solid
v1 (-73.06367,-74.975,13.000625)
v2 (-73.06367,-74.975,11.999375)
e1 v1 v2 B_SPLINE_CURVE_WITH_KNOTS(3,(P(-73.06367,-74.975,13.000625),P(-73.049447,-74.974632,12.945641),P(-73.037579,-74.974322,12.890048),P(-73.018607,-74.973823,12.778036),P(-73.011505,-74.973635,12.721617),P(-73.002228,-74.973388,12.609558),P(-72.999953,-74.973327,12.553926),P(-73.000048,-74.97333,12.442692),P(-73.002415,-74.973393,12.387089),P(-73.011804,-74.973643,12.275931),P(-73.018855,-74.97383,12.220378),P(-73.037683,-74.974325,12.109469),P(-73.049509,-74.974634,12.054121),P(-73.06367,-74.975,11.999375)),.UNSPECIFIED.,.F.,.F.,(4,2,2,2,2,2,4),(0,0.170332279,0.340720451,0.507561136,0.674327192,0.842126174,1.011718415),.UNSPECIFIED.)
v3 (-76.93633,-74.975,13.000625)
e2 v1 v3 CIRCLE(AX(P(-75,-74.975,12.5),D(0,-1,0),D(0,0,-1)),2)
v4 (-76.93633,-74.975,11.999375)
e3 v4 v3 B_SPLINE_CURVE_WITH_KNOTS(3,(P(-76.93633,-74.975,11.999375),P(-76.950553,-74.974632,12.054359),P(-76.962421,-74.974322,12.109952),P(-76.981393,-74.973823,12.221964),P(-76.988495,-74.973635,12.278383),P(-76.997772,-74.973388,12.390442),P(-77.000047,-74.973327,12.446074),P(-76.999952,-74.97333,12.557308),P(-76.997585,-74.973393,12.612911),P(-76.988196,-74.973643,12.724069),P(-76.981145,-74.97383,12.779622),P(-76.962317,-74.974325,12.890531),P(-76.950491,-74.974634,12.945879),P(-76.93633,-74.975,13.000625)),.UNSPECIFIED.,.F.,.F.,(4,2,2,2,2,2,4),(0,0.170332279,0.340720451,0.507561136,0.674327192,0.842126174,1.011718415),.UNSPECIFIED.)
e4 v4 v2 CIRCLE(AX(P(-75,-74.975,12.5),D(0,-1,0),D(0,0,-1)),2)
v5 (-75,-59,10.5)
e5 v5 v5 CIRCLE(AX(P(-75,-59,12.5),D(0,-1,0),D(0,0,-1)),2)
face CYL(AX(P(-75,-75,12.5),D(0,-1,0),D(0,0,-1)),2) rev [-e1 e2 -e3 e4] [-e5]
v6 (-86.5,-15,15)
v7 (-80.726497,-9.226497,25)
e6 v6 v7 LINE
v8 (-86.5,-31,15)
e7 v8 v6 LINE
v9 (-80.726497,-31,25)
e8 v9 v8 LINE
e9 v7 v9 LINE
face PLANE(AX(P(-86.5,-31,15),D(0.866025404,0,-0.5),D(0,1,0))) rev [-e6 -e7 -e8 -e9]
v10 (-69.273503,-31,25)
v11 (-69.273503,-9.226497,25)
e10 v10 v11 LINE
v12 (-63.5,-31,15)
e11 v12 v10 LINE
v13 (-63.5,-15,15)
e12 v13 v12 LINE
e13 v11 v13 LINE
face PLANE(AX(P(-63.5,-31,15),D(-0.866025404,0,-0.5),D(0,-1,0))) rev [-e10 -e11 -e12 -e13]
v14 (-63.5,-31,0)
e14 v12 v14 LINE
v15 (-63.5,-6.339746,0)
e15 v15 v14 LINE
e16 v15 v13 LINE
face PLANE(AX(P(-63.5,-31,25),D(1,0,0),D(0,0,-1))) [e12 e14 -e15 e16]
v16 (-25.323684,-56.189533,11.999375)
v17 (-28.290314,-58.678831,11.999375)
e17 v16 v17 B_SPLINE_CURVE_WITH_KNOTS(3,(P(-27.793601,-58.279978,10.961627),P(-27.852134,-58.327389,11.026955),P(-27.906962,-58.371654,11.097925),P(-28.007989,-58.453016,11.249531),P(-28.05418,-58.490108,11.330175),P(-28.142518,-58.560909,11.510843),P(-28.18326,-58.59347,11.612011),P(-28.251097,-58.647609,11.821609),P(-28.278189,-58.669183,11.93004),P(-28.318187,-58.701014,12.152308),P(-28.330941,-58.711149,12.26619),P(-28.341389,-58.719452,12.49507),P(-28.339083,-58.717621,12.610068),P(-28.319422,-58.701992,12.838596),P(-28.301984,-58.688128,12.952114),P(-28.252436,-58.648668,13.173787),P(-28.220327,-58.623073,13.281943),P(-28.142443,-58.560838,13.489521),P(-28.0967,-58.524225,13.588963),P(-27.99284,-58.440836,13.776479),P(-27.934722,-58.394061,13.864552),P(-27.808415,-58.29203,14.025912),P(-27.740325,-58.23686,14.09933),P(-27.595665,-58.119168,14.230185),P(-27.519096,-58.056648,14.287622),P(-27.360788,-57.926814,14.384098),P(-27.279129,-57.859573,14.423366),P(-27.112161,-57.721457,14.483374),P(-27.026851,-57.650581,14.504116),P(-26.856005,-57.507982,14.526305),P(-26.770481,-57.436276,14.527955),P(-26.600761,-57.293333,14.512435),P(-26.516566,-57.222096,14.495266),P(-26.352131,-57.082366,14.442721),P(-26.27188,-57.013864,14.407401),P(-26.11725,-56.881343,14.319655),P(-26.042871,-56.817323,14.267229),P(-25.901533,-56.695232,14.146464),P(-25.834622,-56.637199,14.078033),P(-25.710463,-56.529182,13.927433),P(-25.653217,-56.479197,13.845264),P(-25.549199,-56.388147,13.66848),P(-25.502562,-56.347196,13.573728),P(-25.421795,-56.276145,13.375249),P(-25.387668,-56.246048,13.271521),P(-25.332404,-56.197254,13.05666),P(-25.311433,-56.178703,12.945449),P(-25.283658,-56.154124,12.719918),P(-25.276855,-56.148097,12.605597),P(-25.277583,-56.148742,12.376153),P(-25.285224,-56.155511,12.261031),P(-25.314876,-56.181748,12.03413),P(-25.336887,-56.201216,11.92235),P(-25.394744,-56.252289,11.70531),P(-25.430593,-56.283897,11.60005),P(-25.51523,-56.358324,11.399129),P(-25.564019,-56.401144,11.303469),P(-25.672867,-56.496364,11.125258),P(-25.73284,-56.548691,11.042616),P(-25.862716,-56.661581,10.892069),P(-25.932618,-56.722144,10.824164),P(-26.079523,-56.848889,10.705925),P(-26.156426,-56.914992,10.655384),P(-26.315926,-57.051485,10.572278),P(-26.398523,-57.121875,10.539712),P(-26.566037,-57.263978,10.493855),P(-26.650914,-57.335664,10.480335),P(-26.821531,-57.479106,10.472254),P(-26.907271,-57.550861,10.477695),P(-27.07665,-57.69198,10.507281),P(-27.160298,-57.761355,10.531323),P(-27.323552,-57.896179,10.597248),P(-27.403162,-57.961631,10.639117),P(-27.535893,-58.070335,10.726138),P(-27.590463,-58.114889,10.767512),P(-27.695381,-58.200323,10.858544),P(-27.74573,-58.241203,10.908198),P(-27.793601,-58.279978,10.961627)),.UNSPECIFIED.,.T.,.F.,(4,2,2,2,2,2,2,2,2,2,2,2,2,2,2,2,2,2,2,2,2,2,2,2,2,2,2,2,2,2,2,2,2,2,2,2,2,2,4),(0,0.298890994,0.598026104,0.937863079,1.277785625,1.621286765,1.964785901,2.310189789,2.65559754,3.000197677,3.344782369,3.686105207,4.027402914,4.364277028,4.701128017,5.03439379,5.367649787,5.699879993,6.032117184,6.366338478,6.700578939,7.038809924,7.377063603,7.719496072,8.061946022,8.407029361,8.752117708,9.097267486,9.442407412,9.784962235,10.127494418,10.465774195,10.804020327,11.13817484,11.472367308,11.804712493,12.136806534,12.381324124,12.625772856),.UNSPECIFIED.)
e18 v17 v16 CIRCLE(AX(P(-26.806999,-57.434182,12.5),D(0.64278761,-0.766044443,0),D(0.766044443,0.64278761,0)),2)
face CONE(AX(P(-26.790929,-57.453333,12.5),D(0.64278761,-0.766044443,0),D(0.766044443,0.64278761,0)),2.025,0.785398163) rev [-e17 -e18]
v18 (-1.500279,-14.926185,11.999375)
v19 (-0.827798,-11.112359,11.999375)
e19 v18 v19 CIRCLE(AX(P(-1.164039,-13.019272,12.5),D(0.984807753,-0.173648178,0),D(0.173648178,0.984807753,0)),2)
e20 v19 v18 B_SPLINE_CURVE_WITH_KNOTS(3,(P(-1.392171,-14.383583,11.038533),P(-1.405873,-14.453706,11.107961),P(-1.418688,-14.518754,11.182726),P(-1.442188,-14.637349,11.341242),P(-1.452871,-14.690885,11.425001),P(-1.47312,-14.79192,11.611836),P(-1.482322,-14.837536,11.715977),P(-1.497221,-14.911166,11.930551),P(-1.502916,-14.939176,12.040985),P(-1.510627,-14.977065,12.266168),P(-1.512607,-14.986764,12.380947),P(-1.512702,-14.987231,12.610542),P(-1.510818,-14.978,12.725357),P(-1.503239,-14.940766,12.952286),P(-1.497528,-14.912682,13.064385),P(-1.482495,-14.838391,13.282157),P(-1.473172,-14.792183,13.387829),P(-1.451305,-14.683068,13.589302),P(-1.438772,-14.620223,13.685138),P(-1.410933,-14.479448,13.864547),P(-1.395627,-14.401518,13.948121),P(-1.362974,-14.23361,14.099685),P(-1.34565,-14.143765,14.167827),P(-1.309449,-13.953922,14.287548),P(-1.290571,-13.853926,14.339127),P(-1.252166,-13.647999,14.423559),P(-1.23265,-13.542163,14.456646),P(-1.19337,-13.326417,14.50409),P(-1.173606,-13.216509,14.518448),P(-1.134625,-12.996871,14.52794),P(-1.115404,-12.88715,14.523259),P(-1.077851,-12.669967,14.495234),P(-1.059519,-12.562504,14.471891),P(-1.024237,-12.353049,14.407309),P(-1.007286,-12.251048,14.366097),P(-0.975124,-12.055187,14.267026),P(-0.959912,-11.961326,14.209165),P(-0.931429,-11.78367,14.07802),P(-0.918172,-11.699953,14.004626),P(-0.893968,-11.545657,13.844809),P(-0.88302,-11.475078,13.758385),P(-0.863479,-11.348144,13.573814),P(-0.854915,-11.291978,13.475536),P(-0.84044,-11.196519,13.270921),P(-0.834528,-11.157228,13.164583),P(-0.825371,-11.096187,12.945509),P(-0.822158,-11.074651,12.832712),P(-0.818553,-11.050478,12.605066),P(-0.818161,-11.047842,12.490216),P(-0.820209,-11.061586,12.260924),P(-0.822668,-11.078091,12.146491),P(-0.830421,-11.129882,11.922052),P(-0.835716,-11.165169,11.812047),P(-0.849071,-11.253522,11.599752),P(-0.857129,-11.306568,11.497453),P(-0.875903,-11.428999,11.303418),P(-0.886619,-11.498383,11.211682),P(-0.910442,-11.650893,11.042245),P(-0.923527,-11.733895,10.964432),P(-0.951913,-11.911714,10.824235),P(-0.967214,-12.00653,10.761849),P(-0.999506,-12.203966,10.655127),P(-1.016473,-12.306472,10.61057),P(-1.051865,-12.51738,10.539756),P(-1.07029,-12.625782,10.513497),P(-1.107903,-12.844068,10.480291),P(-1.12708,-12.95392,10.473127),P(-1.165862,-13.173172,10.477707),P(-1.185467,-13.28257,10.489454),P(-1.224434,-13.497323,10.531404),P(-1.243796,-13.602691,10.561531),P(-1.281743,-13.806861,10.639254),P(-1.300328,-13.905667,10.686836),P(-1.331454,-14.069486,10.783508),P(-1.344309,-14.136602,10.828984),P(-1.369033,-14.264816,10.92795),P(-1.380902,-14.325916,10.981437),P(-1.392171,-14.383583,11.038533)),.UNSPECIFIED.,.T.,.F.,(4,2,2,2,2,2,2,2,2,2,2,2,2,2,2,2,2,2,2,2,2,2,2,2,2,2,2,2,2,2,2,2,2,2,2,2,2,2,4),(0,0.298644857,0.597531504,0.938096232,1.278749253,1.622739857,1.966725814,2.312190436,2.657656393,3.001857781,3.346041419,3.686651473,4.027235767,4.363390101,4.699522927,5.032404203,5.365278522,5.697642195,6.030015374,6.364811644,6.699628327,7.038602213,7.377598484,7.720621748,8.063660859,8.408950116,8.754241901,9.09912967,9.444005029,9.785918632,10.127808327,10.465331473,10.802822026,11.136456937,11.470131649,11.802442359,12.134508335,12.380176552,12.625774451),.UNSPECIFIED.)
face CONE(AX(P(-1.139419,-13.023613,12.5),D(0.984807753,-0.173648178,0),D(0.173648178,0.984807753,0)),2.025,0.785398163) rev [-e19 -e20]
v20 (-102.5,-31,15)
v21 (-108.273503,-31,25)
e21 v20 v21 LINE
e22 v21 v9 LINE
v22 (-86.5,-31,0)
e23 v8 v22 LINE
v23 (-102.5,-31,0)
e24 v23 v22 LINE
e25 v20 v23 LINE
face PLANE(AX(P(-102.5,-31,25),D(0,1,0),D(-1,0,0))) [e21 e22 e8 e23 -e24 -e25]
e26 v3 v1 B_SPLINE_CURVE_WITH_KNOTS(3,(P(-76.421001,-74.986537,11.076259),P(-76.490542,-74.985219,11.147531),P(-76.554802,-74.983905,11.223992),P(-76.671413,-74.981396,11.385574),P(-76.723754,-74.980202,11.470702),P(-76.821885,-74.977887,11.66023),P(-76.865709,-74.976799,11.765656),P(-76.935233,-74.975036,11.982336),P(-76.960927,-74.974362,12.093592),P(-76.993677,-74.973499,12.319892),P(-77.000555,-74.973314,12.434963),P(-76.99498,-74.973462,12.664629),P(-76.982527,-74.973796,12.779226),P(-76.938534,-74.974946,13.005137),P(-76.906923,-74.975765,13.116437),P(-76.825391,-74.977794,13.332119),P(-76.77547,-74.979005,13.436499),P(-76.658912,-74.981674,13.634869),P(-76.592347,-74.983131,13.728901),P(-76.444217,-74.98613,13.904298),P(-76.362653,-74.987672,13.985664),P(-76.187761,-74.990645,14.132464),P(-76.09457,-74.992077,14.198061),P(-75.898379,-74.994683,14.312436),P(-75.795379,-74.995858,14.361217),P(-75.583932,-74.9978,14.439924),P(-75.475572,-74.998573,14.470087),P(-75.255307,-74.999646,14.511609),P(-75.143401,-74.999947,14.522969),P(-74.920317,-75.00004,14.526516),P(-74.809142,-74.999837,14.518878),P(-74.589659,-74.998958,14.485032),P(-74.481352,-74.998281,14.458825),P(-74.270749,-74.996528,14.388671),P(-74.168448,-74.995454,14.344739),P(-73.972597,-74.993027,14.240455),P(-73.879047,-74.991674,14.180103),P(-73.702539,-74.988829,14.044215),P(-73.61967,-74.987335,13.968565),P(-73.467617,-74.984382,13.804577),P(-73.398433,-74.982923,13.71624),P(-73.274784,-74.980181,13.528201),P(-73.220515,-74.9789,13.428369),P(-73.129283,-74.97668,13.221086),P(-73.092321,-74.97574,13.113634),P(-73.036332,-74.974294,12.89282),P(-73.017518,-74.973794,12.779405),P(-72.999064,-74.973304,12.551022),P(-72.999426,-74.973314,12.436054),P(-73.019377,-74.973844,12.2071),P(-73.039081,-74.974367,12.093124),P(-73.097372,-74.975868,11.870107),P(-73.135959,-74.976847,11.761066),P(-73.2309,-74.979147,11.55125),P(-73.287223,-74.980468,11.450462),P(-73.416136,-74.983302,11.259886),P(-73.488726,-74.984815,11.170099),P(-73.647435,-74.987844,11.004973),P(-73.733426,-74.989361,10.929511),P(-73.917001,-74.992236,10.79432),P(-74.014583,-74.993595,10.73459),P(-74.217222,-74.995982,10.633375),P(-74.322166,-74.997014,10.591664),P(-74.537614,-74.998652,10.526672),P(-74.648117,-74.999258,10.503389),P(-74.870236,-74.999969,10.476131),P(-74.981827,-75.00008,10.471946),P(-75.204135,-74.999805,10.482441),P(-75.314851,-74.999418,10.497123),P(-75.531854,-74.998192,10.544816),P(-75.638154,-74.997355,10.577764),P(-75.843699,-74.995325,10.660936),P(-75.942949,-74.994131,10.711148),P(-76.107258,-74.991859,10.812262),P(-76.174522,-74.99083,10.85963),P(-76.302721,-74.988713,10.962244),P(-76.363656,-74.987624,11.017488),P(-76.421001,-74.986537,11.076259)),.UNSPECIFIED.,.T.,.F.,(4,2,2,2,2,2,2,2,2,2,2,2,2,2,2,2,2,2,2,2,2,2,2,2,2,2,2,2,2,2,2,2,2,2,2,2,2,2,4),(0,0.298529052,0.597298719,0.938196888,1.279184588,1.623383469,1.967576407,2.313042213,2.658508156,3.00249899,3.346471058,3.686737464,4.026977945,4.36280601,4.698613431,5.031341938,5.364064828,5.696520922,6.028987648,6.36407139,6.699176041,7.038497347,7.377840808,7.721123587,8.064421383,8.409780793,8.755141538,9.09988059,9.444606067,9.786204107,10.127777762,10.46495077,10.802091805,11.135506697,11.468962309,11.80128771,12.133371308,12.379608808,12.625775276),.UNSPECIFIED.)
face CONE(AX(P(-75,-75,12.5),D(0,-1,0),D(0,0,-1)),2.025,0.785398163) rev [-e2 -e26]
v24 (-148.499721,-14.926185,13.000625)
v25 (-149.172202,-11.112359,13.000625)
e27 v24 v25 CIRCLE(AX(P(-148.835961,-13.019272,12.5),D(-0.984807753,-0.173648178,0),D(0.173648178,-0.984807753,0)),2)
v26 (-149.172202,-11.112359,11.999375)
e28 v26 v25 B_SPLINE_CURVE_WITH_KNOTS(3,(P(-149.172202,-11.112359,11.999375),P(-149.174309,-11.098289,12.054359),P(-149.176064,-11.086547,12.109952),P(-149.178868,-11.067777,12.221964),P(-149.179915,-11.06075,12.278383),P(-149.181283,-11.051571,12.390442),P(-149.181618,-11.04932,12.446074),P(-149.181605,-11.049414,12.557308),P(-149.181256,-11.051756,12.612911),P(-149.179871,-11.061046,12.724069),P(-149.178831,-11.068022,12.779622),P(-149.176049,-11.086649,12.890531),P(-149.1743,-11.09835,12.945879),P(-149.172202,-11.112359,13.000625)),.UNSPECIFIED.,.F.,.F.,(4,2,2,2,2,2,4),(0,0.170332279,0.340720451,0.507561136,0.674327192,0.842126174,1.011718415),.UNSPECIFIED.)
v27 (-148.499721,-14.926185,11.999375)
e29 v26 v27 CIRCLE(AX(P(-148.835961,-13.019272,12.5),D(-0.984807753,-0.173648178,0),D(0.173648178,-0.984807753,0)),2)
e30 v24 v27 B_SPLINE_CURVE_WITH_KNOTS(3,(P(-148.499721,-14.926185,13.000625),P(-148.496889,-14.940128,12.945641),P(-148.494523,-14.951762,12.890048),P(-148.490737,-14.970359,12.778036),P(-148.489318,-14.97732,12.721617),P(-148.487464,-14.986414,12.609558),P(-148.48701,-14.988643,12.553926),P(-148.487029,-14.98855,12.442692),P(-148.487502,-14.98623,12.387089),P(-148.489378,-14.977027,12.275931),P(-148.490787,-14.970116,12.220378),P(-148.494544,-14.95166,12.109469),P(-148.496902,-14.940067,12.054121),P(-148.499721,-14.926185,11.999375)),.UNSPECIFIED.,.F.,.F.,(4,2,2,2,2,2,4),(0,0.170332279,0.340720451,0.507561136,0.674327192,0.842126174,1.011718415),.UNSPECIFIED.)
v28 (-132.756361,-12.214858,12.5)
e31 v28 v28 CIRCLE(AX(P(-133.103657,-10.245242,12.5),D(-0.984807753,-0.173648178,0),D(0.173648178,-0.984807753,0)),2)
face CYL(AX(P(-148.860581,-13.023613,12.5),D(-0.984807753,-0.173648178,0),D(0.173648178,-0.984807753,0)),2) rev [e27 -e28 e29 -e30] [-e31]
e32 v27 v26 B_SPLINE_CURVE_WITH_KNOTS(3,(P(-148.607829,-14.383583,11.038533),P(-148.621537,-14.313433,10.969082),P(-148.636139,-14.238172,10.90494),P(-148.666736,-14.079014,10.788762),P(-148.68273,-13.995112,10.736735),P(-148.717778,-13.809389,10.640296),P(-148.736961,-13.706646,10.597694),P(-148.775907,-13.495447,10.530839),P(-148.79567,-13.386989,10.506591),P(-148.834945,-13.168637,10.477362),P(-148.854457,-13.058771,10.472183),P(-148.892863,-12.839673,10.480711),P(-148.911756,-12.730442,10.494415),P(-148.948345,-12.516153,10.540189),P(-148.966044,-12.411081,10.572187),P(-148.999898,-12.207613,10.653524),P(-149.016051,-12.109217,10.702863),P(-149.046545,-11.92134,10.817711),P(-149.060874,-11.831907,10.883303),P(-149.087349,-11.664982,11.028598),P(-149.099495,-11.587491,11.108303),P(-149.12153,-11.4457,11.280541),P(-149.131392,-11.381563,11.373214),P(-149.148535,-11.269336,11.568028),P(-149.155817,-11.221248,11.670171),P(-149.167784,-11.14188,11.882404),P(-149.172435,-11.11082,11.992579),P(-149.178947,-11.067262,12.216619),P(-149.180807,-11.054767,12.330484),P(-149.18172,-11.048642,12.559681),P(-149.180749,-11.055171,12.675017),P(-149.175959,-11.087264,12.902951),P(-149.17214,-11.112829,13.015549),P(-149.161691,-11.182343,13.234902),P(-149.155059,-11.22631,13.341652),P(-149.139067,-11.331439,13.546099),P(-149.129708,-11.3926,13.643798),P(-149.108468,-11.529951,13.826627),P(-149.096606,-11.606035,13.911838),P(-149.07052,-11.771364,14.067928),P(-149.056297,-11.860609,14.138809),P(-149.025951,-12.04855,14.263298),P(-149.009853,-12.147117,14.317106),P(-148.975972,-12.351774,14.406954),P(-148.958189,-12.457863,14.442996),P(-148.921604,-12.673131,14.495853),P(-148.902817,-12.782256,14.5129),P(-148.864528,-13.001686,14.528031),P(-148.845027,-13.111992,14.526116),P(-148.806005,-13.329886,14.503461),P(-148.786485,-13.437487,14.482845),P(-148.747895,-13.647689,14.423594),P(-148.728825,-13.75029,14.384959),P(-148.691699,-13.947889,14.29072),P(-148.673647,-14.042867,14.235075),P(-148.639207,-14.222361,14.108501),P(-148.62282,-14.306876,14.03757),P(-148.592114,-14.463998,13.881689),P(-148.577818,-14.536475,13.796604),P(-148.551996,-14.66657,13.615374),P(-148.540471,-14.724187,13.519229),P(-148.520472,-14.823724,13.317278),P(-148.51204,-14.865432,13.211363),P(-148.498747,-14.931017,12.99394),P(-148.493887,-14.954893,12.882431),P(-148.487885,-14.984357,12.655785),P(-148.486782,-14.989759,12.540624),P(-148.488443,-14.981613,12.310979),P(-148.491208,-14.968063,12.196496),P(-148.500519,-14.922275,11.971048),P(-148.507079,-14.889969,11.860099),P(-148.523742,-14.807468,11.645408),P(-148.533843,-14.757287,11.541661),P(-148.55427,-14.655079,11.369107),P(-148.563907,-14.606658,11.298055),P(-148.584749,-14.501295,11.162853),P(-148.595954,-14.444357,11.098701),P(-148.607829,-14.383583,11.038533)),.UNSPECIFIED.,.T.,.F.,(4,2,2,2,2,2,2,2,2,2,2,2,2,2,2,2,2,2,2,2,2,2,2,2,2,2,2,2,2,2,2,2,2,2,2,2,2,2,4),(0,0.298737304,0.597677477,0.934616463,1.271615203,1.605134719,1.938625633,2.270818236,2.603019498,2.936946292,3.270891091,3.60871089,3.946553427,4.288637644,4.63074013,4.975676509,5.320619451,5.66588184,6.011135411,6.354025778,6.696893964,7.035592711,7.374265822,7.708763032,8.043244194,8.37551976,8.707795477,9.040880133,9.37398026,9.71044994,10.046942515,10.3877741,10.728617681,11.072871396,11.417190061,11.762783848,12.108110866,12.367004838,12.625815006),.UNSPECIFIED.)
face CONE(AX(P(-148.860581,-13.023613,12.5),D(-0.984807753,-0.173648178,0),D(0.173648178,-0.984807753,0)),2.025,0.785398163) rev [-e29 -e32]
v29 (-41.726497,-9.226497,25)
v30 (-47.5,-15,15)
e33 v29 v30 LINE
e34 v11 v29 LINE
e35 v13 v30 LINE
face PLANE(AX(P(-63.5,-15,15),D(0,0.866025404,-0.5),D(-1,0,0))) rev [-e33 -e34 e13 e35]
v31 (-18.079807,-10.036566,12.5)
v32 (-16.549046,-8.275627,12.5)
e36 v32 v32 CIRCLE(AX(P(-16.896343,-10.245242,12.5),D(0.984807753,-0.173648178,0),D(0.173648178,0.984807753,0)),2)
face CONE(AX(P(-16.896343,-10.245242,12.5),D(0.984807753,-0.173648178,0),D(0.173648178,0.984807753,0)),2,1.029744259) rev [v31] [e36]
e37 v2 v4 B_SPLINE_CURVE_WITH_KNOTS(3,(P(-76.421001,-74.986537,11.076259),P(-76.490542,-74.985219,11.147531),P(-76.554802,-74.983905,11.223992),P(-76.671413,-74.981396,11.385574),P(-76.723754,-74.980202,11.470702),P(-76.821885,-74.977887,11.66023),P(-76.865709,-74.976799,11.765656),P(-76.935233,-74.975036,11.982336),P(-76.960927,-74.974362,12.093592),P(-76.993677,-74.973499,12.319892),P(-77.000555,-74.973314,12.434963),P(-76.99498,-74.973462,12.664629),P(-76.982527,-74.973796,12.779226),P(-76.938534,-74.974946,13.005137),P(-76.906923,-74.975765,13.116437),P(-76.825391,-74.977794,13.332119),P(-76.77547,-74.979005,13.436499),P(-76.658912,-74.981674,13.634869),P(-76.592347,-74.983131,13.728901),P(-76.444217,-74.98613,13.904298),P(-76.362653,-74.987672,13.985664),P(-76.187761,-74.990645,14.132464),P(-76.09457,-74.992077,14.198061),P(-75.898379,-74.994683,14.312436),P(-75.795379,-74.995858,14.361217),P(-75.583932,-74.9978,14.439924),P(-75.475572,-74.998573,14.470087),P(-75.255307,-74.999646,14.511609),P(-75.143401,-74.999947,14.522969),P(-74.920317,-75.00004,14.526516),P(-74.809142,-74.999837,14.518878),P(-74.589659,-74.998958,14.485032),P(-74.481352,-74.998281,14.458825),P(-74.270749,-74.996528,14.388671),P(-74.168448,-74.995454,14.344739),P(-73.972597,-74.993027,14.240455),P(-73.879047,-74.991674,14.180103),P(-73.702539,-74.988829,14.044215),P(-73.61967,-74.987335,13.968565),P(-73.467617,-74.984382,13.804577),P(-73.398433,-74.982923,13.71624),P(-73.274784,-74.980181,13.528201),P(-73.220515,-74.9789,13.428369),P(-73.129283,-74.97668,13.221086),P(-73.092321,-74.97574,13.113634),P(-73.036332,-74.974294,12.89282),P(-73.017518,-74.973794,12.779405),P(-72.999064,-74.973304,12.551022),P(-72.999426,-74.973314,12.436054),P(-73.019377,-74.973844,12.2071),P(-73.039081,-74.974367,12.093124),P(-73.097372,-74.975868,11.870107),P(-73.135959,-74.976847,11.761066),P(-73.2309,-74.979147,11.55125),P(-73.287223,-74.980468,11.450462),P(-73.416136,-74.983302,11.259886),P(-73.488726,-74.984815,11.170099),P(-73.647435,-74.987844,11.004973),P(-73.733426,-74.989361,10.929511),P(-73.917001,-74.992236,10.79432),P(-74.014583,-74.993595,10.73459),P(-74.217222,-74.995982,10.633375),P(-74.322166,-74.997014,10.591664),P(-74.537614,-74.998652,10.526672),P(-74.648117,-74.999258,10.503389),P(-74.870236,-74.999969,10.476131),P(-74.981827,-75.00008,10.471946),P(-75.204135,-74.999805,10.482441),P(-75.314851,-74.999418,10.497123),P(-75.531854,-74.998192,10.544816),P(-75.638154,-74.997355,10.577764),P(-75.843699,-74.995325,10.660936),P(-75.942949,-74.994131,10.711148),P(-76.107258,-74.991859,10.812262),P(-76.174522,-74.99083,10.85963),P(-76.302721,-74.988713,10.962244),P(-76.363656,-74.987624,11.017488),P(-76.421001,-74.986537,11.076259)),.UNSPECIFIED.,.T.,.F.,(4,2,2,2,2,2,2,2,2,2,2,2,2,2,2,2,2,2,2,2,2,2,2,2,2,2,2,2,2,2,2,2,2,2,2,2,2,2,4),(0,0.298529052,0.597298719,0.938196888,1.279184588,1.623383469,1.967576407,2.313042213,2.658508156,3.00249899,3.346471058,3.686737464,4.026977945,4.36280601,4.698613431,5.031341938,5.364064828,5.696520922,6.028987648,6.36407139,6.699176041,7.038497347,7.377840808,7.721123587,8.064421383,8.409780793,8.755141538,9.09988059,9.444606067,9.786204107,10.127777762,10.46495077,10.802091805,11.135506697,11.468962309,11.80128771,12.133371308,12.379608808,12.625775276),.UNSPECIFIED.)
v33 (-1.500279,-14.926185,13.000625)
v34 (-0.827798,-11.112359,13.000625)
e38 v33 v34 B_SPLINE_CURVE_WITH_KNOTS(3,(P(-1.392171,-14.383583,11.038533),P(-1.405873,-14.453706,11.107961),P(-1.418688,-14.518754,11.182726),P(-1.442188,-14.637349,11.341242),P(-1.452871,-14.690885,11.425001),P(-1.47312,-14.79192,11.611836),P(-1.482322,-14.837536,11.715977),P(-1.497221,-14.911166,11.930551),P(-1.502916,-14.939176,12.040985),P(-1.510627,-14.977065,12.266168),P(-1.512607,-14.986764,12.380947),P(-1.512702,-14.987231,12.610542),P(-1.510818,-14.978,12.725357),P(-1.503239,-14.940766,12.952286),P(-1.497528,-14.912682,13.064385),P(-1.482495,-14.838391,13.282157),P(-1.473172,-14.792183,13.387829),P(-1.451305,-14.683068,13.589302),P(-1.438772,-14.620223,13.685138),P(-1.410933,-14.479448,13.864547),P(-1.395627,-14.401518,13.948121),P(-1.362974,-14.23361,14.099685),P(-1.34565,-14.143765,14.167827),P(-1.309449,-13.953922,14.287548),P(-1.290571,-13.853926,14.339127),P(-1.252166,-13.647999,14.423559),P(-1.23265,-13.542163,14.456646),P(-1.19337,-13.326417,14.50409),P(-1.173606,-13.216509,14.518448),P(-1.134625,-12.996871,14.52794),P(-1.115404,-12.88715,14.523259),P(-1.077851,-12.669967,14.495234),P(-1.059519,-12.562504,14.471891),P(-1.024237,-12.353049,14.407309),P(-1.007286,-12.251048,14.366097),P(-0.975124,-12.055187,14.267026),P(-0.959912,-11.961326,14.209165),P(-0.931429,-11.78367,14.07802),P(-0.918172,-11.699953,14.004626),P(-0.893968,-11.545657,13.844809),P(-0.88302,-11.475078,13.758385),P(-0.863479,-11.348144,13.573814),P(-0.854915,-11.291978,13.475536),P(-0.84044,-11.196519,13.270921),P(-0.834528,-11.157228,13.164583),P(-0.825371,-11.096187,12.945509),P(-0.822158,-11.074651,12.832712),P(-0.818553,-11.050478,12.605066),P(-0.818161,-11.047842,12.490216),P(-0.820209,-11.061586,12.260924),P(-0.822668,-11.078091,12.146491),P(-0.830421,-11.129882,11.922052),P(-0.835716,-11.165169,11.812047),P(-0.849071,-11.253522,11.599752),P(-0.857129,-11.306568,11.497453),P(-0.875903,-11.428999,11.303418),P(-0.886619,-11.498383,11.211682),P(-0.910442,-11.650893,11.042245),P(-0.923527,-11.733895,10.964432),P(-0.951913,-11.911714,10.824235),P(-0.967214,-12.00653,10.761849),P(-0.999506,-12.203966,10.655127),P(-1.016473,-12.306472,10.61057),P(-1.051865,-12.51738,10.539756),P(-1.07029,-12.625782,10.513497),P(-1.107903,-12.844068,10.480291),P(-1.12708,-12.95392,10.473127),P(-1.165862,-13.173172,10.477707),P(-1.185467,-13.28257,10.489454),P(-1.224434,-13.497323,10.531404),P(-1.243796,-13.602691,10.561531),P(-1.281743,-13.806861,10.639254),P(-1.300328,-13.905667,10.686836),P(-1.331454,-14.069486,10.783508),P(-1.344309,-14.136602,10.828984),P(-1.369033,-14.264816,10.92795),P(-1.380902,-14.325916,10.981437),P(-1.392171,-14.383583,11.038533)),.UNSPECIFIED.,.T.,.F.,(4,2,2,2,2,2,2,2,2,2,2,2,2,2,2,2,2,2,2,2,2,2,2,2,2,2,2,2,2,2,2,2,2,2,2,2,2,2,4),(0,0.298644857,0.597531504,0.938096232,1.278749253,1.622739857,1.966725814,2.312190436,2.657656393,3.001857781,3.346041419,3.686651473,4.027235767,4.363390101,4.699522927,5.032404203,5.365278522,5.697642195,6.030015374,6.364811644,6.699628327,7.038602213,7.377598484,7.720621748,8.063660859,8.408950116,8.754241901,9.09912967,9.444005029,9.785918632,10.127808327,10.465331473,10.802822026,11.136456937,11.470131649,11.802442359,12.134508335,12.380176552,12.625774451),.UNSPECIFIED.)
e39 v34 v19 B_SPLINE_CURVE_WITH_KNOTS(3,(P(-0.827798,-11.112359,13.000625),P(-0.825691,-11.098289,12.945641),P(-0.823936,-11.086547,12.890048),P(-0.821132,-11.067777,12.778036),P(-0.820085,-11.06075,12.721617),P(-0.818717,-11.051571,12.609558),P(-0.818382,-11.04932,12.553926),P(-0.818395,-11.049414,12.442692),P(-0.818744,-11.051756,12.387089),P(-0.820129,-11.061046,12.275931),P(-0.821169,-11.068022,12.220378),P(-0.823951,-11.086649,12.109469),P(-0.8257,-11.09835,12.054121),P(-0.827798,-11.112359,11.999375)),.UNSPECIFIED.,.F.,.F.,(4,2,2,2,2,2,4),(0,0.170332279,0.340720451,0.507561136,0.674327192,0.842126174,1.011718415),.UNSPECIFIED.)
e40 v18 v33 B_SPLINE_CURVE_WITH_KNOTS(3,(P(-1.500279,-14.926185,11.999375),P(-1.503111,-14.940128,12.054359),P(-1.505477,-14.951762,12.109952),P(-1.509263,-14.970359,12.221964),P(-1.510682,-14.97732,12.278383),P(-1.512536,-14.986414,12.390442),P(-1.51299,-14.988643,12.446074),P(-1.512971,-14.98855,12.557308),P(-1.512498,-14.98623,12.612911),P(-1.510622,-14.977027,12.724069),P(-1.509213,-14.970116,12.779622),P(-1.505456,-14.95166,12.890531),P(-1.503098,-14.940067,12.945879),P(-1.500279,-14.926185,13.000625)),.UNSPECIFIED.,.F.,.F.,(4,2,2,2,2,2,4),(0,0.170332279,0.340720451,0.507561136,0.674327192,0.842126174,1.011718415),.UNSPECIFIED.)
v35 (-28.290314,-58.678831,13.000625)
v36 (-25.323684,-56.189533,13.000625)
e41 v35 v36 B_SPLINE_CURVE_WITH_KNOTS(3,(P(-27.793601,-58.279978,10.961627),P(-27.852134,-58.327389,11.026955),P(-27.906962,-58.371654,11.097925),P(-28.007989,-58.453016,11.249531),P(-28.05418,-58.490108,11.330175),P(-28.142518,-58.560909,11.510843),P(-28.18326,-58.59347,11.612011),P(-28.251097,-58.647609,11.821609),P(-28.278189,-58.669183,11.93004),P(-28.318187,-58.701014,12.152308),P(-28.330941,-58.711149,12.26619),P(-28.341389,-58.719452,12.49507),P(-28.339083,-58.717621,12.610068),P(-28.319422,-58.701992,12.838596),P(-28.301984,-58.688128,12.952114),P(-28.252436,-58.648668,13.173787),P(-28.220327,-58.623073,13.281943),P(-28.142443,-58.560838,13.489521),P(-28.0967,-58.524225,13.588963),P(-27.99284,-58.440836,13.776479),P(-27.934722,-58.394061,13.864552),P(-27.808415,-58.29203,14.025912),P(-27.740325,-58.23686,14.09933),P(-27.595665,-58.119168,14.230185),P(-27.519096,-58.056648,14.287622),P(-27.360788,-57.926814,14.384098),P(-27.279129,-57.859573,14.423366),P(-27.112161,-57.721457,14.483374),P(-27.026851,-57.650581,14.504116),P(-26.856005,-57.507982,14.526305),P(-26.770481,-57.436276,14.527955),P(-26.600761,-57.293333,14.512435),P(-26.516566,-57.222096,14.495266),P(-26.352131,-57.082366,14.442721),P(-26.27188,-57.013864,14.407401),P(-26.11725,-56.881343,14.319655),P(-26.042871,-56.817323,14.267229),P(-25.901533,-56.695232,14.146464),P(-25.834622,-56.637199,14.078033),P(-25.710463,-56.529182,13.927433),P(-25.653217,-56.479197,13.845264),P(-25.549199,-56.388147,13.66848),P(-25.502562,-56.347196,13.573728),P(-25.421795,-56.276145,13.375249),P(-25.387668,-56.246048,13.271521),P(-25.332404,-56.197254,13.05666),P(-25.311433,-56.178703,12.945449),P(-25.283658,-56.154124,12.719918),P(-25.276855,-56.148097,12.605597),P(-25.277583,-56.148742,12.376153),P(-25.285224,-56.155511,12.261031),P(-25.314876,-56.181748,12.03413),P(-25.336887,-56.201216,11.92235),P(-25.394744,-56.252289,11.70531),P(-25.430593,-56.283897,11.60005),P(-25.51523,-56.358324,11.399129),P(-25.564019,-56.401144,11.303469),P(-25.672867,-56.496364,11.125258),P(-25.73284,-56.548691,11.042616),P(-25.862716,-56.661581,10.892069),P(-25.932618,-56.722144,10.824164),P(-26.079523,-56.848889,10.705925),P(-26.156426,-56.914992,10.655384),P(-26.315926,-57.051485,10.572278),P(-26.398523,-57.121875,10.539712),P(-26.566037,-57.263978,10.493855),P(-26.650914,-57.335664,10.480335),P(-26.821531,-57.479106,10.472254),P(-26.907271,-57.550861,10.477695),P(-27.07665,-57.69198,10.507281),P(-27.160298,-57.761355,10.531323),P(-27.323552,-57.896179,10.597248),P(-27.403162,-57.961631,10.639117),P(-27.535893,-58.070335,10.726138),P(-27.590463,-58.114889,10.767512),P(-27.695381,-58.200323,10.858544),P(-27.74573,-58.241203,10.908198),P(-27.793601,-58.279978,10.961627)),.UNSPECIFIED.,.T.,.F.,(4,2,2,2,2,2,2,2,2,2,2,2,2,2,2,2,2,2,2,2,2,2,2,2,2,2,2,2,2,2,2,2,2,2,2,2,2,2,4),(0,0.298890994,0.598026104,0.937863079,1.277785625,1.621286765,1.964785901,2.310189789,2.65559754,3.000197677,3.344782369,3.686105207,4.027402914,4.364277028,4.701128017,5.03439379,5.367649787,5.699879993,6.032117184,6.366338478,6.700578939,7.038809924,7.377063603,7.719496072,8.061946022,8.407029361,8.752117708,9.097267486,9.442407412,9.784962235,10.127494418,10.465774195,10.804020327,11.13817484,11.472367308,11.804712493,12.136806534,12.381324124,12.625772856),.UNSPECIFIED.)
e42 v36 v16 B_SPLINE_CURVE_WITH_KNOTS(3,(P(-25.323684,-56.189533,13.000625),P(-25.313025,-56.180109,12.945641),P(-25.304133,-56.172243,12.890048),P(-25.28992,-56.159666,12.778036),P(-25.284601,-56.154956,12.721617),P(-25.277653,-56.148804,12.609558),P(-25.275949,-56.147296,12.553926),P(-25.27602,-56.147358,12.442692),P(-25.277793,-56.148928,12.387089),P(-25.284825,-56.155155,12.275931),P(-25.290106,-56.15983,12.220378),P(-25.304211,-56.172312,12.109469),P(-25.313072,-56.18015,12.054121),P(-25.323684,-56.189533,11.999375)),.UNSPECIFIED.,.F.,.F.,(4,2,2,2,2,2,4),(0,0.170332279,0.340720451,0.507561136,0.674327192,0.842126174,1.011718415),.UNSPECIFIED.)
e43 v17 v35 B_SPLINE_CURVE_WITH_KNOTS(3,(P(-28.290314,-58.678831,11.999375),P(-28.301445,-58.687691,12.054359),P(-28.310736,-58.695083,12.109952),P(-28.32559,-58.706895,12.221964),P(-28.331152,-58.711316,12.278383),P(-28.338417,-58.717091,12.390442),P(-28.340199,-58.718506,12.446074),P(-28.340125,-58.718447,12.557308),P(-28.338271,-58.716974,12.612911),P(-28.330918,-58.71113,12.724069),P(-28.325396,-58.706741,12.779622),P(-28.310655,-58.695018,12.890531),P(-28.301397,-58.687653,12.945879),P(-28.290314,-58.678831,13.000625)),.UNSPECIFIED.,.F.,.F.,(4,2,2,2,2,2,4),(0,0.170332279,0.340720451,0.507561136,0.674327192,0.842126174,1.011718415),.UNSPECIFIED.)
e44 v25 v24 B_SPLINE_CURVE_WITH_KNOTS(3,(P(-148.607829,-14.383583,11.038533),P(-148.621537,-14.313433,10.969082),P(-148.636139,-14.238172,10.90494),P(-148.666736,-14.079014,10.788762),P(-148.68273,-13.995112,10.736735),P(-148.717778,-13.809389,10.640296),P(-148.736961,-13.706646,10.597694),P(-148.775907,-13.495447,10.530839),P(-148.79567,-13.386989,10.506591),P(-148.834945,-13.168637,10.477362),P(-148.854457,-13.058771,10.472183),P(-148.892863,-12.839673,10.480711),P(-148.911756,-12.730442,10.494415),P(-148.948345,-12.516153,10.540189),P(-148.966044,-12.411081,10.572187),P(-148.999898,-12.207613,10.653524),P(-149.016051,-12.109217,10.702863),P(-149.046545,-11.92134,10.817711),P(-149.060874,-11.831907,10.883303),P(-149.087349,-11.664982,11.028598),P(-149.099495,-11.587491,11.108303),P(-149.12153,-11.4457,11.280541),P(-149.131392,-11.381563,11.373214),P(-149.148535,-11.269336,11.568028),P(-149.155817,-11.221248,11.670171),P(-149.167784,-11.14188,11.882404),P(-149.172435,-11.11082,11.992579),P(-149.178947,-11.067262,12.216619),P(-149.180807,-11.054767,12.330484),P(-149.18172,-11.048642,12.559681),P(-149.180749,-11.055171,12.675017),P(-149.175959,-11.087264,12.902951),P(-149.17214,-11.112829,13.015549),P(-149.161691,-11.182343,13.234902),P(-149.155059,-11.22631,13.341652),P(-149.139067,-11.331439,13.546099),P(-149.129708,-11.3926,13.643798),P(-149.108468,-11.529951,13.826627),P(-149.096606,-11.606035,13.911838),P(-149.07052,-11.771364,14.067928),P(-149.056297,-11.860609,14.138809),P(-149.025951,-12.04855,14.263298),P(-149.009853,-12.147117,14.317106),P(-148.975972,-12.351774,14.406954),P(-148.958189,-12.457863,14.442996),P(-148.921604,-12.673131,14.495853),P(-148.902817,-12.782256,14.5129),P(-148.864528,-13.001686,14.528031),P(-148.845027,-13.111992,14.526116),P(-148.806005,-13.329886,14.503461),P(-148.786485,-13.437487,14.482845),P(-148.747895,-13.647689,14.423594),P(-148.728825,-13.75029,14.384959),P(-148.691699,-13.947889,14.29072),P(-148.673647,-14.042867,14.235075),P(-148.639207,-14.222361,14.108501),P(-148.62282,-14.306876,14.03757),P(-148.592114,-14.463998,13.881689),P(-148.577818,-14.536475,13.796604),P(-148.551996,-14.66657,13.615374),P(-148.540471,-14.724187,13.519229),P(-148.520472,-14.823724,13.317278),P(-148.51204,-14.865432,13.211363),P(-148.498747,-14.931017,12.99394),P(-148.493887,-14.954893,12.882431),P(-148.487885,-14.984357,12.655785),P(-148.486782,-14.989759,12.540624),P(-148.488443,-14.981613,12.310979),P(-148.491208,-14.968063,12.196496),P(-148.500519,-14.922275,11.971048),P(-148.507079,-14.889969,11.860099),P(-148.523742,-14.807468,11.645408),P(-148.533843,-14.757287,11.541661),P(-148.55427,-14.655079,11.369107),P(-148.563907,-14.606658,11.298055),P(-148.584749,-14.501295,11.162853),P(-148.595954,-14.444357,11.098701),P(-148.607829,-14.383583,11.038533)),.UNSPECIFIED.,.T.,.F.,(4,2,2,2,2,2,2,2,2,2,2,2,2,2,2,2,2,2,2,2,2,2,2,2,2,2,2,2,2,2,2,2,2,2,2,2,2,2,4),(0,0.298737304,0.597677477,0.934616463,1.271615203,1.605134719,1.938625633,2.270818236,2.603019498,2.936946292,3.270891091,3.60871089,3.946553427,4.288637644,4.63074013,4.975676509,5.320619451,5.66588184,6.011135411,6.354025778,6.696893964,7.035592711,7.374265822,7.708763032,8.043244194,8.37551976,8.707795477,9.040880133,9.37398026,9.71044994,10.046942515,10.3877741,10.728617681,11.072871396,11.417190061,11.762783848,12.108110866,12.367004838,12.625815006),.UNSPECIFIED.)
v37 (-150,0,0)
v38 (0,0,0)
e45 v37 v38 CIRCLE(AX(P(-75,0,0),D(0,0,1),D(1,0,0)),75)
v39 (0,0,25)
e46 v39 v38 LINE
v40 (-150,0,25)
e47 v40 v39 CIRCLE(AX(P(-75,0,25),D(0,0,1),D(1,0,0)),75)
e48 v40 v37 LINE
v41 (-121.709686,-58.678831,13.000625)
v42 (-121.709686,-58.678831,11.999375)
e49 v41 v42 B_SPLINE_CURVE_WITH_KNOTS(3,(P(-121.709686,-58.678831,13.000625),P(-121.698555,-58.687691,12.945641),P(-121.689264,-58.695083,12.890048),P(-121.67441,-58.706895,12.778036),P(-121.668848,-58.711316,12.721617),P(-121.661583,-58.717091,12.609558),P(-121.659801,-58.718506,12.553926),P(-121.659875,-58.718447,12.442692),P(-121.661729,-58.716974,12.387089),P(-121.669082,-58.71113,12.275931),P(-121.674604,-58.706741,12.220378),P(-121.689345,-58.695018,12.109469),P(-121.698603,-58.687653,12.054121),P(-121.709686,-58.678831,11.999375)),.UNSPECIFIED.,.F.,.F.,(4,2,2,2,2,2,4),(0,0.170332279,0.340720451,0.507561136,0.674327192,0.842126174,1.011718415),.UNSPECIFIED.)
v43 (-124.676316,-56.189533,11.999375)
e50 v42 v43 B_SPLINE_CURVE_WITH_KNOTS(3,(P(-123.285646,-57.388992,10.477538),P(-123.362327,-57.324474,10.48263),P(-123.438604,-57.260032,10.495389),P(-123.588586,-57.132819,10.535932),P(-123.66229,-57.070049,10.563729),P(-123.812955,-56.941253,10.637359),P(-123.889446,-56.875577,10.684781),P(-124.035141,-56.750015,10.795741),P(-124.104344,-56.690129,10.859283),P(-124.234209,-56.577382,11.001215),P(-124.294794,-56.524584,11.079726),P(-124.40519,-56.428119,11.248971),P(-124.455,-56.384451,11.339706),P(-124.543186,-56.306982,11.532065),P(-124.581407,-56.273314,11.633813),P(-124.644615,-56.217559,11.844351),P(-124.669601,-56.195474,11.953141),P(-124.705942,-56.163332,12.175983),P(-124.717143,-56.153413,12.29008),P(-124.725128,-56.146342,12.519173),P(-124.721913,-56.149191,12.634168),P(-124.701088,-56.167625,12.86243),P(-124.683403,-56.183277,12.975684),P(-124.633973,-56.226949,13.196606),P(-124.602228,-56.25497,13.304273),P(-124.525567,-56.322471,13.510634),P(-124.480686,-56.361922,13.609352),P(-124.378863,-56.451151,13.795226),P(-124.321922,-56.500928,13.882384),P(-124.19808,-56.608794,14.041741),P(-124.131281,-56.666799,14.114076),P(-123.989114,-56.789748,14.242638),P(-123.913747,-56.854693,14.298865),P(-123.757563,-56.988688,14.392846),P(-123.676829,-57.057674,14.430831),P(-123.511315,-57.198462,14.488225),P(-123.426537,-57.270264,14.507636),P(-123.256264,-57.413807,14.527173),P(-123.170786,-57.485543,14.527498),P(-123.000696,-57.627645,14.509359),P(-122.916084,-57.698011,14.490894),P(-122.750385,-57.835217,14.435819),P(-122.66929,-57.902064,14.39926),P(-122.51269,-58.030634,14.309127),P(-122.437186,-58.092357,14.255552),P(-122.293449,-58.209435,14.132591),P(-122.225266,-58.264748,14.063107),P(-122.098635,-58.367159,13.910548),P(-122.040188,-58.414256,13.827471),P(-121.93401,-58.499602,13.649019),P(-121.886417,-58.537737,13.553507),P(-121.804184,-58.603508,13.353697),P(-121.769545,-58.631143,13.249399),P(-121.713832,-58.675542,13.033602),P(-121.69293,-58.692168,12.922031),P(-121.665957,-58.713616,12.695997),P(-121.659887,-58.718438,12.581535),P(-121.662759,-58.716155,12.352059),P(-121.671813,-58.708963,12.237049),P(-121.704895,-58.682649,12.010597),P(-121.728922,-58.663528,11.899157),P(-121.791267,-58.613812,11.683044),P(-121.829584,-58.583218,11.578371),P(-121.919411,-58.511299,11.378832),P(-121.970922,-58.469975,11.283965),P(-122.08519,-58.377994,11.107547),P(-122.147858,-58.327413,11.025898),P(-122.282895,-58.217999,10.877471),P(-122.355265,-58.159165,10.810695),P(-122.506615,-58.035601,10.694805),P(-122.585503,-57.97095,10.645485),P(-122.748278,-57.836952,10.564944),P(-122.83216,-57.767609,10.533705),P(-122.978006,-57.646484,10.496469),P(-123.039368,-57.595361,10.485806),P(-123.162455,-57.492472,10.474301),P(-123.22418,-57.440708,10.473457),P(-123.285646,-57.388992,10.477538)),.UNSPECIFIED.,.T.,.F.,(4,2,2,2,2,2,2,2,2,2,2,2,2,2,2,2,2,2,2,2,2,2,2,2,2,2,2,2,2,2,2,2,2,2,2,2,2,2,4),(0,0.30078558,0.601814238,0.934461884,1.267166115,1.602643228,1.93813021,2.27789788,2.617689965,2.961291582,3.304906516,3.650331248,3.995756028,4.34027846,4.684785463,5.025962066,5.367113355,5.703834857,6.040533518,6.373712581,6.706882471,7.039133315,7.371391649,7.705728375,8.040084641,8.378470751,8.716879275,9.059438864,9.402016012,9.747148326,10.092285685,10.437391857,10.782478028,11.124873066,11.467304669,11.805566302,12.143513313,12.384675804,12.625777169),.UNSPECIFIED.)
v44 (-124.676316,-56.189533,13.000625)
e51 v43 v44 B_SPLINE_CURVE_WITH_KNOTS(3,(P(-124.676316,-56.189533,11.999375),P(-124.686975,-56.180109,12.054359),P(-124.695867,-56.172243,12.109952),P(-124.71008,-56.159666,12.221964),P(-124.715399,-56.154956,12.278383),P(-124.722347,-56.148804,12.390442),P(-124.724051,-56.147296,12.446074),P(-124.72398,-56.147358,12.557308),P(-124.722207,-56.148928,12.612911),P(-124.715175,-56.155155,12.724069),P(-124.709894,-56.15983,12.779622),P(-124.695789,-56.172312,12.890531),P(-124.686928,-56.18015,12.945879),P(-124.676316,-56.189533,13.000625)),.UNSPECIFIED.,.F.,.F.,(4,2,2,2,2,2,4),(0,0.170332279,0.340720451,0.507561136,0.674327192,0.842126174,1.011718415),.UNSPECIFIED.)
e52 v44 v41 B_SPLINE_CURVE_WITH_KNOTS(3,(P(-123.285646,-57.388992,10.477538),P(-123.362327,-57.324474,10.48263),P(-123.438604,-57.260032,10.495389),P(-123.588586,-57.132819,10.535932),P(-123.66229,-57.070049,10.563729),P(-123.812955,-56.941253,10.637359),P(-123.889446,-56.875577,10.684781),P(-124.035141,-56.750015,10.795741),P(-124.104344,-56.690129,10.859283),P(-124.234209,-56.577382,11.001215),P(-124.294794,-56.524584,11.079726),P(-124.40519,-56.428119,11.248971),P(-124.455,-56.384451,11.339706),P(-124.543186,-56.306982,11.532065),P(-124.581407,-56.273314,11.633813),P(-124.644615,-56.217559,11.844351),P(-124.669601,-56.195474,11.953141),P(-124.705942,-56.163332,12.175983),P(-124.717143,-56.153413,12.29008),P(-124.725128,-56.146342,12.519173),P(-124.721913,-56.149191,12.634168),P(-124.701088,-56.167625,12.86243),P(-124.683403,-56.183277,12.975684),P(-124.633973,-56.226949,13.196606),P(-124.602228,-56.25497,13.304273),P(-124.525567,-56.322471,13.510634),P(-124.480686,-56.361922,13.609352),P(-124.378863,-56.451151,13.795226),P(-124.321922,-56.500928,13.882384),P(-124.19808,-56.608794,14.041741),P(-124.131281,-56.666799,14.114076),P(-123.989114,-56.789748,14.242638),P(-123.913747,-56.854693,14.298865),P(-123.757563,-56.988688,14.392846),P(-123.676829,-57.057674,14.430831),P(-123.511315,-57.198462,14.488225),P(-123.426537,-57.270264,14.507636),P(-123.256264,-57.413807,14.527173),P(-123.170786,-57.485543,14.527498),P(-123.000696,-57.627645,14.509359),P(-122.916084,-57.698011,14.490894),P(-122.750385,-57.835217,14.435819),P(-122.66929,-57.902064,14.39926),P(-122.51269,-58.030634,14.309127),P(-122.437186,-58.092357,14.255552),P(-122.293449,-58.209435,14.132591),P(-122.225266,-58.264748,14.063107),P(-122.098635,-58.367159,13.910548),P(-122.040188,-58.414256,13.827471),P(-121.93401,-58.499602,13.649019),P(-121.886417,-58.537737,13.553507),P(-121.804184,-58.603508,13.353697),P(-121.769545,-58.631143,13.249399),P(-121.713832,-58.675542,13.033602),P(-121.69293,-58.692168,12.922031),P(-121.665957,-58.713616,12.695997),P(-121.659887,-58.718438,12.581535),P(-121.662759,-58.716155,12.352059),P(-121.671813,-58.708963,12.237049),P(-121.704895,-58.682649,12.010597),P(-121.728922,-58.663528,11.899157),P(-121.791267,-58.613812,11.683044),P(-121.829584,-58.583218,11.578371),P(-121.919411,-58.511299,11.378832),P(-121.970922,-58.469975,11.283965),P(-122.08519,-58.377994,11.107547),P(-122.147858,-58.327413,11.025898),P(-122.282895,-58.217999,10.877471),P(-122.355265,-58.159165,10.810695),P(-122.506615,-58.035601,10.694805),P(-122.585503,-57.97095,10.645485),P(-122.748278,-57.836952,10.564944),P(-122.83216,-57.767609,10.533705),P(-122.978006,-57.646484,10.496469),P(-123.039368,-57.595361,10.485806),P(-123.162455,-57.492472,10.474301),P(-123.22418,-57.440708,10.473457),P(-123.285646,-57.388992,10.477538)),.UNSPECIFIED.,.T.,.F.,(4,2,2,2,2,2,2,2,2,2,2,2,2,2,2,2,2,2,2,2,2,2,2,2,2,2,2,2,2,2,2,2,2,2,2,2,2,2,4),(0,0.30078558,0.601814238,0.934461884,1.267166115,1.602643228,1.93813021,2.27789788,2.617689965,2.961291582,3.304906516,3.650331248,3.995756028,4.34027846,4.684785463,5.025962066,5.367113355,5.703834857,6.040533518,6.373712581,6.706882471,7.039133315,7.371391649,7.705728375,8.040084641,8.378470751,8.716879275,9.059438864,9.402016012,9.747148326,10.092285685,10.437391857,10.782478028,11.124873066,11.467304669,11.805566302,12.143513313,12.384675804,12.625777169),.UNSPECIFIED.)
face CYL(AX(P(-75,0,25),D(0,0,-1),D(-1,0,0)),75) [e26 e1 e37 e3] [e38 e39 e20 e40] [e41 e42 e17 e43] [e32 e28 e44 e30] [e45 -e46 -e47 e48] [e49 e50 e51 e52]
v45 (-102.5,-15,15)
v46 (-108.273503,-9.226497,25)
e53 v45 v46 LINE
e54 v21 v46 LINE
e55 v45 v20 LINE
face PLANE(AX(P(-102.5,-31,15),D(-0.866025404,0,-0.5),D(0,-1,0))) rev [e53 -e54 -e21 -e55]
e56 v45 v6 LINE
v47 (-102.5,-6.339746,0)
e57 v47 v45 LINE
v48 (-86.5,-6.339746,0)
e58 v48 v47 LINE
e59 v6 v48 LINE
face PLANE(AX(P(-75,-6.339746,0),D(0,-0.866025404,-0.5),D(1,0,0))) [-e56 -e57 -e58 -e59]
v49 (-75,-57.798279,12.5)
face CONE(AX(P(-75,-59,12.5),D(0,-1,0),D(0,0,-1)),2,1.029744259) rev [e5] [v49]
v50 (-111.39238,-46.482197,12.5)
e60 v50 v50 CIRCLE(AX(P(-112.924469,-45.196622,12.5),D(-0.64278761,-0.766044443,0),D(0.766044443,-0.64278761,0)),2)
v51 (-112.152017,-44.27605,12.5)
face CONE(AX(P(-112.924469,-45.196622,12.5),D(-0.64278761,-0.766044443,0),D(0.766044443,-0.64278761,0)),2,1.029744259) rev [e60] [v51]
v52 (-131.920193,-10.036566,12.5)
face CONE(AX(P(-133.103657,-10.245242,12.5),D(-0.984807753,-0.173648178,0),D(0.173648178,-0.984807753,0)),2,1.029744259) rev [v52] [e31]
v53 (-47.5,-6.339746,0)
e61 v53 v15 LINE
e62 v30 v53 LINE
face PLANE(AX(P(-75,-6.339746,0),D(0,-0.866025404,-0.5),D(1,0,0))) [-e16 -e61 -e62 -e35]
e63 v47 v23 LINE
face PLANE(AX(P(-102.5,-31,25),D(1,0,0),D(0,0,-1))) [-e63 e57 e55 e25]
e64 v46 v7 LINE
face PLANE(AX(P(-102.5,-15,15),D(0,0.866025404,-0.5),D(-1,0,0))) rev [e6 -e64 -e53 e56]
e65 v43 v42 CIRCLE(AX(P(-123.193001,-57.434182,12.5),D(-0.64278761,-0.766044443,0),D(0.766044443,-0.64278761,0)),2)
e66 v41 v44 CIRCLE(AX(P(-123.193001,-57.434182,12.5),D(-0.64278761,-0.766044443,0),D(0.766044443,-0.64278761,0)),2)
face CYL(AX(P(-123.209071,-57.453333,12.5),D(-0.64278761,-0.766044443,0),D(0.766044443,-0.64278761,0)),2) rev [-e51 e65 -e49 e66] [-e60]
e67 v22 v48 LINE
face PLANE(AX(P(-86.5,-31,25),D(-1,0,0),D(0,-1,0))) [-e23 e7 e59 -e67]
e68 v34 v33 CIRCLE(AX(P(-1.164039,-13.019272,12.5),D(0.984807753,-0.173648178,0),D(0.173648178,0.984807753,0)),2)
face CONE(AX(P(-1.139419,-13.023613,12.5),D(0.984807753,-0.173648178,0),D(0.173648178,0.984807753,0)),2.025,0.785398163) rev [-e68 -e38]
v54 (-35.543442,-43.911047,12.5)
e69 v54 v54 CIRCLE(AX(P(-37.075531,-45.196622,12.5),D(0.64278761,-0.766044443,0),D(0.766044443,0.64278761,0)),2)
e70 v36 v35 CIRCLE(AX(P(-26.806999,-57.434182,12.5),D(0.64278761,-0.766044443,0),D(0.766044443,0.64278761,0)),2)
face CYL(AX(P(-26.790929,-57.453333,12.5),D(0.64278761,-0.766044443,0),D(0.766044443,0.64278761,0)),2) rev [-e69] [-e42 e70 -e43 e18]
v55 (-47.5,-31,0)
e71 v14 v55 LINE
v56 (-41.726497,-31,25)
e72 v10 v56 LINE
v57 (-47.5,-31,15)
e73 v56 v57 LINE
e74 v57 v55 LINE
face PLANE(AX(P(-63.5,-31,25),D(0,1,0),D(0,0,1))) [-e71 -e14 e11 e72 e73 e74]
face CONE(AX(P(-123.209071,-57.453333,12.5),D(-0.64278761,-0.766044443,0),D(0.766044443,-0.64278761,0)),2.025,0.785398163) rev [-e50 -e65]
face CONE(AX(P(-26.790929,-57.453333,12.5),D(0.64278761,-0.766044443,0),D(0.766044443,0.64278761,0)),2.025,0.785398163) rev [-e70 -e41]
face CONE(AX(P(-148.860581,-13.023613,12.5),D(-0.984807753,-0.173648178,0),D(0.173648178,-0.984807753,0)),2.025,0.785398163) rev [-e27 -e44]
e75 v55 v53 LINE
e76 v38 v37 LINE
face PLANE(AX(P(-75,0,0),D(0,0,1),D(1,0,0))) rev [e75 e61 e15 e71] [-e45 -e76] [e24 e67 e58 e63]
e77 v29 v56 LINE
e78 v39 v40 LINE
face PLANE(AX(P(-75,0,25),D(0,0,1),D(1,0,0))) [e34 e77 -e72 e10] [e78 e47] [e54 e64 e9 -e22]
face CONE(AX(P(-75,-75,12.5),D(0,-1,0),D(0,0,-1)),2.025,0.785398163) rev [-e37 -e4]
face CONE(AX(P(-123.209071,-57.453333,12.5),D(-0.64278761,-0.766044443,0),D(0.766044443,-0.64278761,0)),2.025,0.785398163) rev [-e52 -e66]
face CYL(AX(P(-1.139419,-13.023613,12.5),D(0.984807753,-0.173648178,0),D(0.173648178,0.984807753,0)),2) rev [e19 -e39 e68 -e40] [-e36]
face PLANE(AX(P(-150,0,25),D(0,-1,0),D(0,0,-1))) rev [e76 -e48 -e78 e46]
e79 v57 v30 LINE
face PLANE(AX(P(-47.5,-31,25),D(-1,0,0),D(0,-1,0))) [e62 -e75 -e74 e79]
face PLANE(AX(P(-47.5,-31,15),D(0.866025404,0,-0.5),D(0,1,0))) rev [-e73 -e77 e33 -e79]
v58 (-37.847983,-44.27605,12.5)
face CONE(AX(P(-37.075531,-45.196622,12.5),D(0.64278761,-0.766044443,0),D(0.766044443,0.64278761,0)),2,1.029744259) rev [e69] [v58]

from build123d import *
from OCP.BRepFilletAPI import BRepFilletAPI_MakeChamfer

# Parameters (mm, degrees)
SKETCH1_W           = 16
SKETCH1_H           = 16
BOSS_EXTRUDE1_DEPTH = 25
CIRPATTERN1_COUNT   = 5
CIRPATTERN1_ANGLE   = 160
CHAMFER1_SIZE       = 15
CHAMFER1_SIZE2      = 8.660254038
CHAMFER3_SIZE       = 10
CHAMFER3_SIZE_2     = 5.773502692


with BuildPart() as part:
    # Sketch1 → Boss-Extrude1 (new body)
    with BuildSketch(Plane.XY):
        with BuildLine():
            Line((-150, 0), (0, 0))
            ThreePointArc((0, 0), (-75, -75), (-150, 0))
        make_face()
        with Locations((-55.5, -23)):
            Rectangle(SKETCH1_W, SKETCH1_H, mode=Mode.SUBTRACT)
        with Locations((-94.5, -23)):
            Rectangle(SKETCH1_W, SKETCH1_H, mode=Mode.SUBTRACT)
    extrude(amount=BOSS_EXTRUDE1_DEPTH)

    # Sketch4 → Ø4.0mm Dowel Hole2 (revolve, cut)
    with BuildSketch(Plane(origin=(-1.139418524, -13.023613325, 12.5), x_dir=(0.17364817766693047, 0.9848077530122081, 0), z_dir=(0, 0, 1))):
        Polygon((0, 0), (0, 17.201721238), (2, 16), (2, 0.025), (2.025, 0), align=None)
    f_4_0mm_dowel_hole2 = revolve(axis=Axis((5.114110708, -14.126279253, 12.5), (-0.9848077530122081, 0.17364817766693044, 0)), mode=Mode.SUBTRACT)

    # CirPattern1: Ø4.0mm Dowel Hole2 ×5 about axis
    cirpattern1_axis = Axis((-75, 0, 0), (0, 0, -1))
    for i in range(1, CIRPATTERN1_COUNT):
        add(f_4_0mm_dowel_hole2.rotate(cirpattern1_axis, i * CIRPATTERN1_ANGLE / (CIRPATTERN1_COUNT - 1)), mode=Mode.SUBTRACT)

    # Chamfer1: one chamfer whose edges measure the first distance from different faces: ONE call of the kernel's chamfer builder (chamfer() names one face for all edges)
    chamfer1_edges_1 = [part.edges().sort_by_distance(p)[0] for p in [
        (-55.5, -15, 0),
    ]]
    chamfer1_side_1 = [part.faces().sort_by_distance(p)[0] for p in [
        (-55.5, -15, 12.5),
    ]]
    chamfer1_edges_2 = [part.edges().sort_by_distance(p)[0] for p in [
        (-94.5, -15, 0),
    ]]
    chamfer1_side_2 = [part.faces().sort_by_distance(p)[0] for p in [
        (-94.5, -15, 12.5),
    ]]
    chamfer1 = BRepFilletAPI_MakeChamfer(part.part.solid().wrapped)
    for e in chamfer1_edges_1:
        chamfer1.Add(CHAMFER1_SIZE, CHAMFER1_SIZE2, e.wrapped, chamfer1_side_1[0].wrapped)  # the first distance lies on this face
    for e in chamfer1_edges_2:
        chamfer1.Add(CHAMFER1_SIZE, CHAMFER1_SIZE2, e.wrapped, chamfer1_side_2[0].wrapped)  # the first distance lies on this face
    add(Compound.cast(chamfer1.Shape()), mode=Mode.REPLACE)

    # Chamfer3
    chamfer3_edges_1 = [part.edges().sort_by_distance(p)[0] for p in [
        (-102.5, -23, 25),
    ]]
    chamfer3_side_1 = [part.faces().sort_by_distance(p)[0] for p in [
        (-102.5, -23, 24.884529946),
    ]]
    chamfer3_edges_2 = [part.edges().sort_by_distance(p)[0] for p in [
        (-94.5, -15, 25),
    ]]
    chamfer3_side_2 = [part.faces().sort_by_distance(p)[0] for p in [
        (-94.5, -14.884529946, 25),
    ]]
    chamfer3_edges_3 = [part.edges().sort_by_distance(p)[0] for p in [
        (-86.5, -23, 25),
    ]]
    chamfer3_side_3 = [part.faces().sort_by_distance(p)[0] for p in [
        (-86.5, -23, 24.884529946),
    ]]
    chamfer3_edges_4 = [part.edges().sort_by_distance(p)[0] for p in [
        (-47.5, -23, 25),
    ]]
    chamfer3_side_4 = [part.faces().sort_by_distance(p)[0] for p in [
        (-47.5, -23, 24.884529946),
    ]]
    chamfer3_edges_5 = [part.edges().sort_by_distance(p)[0] for p in [
        (-55.5, -15, 25),
    ]]
    chamfer3_side_5 = [part.faces().sort_by_distance(p)[0] for p in [
        (-55.5, -15, 24.884529946),
    ]]
    chamfer3_edges_6 = [part.edges().sort_by_distance(p)[0] for p in [
        (-63.5, -23, 25),
    ]]
    chamfer3_side_6 = [part.faces().sort_by_distance(p)[0] for p in [
        (-63.5, -23, 24.884529946),
    ]]
    chamfer3 = BRepFilletAPI_MakeChamfer(part.part.solid().wrapped)
    for e in chamfer3_edges_1:
        chamfer3.Add(CHAMFER3_SIZE - 0.0001, CHAMFER3_SIZE_2 - 0.0001, e.wrapped, chamfer3_side_1[0].wrapped)
    for e in chamfer3_edges_2:
        chamfer3.Add(CHAMFER3_SIZE_2 - 0.0001, CHAMFER3_SIZE - 0.0001, e.wrapped, chamfer3_side_2[0].wrapped)
    for e in chamfer3_edges_3:
        chamfer3.Add(CHAMFER3_SIZE - 0.0001, CHAMFER3_SIZE_2 - 0.0001, e.wrapped, chamfer3_side_3[0].wrapped)
    for e in chamfer3_edges_4:
        chamfer3.Add(CHAMFER3_SIZE - 0.0001, CHAMFER3_SIZE_2 - 0.0001, e.wrapped, chamfer3_side_4[0].wrapped)
    for e in chamfer3_edges_5:
        chamfer3.Add(CHAMFER3_SIZE - 0.0001, CHAMFER3_SIZE_2 - 0.0001, e.wrapped, chamfer3_side_5[0].wrapped)
    for e in chamfer3_edges_6:
        chamfer3.Add(CHAMFER3_SIZE - 0.0001, CHAMFER3_SIZE_2 - 0.0001, e.wrapped, chamfer3_side_6[0].wrapped)
    add(Compound.cast(chamfer3.Shape()), mode=Mode.REPLACE)  # a hair under: the kernel refuses the full size


solid = part.part
